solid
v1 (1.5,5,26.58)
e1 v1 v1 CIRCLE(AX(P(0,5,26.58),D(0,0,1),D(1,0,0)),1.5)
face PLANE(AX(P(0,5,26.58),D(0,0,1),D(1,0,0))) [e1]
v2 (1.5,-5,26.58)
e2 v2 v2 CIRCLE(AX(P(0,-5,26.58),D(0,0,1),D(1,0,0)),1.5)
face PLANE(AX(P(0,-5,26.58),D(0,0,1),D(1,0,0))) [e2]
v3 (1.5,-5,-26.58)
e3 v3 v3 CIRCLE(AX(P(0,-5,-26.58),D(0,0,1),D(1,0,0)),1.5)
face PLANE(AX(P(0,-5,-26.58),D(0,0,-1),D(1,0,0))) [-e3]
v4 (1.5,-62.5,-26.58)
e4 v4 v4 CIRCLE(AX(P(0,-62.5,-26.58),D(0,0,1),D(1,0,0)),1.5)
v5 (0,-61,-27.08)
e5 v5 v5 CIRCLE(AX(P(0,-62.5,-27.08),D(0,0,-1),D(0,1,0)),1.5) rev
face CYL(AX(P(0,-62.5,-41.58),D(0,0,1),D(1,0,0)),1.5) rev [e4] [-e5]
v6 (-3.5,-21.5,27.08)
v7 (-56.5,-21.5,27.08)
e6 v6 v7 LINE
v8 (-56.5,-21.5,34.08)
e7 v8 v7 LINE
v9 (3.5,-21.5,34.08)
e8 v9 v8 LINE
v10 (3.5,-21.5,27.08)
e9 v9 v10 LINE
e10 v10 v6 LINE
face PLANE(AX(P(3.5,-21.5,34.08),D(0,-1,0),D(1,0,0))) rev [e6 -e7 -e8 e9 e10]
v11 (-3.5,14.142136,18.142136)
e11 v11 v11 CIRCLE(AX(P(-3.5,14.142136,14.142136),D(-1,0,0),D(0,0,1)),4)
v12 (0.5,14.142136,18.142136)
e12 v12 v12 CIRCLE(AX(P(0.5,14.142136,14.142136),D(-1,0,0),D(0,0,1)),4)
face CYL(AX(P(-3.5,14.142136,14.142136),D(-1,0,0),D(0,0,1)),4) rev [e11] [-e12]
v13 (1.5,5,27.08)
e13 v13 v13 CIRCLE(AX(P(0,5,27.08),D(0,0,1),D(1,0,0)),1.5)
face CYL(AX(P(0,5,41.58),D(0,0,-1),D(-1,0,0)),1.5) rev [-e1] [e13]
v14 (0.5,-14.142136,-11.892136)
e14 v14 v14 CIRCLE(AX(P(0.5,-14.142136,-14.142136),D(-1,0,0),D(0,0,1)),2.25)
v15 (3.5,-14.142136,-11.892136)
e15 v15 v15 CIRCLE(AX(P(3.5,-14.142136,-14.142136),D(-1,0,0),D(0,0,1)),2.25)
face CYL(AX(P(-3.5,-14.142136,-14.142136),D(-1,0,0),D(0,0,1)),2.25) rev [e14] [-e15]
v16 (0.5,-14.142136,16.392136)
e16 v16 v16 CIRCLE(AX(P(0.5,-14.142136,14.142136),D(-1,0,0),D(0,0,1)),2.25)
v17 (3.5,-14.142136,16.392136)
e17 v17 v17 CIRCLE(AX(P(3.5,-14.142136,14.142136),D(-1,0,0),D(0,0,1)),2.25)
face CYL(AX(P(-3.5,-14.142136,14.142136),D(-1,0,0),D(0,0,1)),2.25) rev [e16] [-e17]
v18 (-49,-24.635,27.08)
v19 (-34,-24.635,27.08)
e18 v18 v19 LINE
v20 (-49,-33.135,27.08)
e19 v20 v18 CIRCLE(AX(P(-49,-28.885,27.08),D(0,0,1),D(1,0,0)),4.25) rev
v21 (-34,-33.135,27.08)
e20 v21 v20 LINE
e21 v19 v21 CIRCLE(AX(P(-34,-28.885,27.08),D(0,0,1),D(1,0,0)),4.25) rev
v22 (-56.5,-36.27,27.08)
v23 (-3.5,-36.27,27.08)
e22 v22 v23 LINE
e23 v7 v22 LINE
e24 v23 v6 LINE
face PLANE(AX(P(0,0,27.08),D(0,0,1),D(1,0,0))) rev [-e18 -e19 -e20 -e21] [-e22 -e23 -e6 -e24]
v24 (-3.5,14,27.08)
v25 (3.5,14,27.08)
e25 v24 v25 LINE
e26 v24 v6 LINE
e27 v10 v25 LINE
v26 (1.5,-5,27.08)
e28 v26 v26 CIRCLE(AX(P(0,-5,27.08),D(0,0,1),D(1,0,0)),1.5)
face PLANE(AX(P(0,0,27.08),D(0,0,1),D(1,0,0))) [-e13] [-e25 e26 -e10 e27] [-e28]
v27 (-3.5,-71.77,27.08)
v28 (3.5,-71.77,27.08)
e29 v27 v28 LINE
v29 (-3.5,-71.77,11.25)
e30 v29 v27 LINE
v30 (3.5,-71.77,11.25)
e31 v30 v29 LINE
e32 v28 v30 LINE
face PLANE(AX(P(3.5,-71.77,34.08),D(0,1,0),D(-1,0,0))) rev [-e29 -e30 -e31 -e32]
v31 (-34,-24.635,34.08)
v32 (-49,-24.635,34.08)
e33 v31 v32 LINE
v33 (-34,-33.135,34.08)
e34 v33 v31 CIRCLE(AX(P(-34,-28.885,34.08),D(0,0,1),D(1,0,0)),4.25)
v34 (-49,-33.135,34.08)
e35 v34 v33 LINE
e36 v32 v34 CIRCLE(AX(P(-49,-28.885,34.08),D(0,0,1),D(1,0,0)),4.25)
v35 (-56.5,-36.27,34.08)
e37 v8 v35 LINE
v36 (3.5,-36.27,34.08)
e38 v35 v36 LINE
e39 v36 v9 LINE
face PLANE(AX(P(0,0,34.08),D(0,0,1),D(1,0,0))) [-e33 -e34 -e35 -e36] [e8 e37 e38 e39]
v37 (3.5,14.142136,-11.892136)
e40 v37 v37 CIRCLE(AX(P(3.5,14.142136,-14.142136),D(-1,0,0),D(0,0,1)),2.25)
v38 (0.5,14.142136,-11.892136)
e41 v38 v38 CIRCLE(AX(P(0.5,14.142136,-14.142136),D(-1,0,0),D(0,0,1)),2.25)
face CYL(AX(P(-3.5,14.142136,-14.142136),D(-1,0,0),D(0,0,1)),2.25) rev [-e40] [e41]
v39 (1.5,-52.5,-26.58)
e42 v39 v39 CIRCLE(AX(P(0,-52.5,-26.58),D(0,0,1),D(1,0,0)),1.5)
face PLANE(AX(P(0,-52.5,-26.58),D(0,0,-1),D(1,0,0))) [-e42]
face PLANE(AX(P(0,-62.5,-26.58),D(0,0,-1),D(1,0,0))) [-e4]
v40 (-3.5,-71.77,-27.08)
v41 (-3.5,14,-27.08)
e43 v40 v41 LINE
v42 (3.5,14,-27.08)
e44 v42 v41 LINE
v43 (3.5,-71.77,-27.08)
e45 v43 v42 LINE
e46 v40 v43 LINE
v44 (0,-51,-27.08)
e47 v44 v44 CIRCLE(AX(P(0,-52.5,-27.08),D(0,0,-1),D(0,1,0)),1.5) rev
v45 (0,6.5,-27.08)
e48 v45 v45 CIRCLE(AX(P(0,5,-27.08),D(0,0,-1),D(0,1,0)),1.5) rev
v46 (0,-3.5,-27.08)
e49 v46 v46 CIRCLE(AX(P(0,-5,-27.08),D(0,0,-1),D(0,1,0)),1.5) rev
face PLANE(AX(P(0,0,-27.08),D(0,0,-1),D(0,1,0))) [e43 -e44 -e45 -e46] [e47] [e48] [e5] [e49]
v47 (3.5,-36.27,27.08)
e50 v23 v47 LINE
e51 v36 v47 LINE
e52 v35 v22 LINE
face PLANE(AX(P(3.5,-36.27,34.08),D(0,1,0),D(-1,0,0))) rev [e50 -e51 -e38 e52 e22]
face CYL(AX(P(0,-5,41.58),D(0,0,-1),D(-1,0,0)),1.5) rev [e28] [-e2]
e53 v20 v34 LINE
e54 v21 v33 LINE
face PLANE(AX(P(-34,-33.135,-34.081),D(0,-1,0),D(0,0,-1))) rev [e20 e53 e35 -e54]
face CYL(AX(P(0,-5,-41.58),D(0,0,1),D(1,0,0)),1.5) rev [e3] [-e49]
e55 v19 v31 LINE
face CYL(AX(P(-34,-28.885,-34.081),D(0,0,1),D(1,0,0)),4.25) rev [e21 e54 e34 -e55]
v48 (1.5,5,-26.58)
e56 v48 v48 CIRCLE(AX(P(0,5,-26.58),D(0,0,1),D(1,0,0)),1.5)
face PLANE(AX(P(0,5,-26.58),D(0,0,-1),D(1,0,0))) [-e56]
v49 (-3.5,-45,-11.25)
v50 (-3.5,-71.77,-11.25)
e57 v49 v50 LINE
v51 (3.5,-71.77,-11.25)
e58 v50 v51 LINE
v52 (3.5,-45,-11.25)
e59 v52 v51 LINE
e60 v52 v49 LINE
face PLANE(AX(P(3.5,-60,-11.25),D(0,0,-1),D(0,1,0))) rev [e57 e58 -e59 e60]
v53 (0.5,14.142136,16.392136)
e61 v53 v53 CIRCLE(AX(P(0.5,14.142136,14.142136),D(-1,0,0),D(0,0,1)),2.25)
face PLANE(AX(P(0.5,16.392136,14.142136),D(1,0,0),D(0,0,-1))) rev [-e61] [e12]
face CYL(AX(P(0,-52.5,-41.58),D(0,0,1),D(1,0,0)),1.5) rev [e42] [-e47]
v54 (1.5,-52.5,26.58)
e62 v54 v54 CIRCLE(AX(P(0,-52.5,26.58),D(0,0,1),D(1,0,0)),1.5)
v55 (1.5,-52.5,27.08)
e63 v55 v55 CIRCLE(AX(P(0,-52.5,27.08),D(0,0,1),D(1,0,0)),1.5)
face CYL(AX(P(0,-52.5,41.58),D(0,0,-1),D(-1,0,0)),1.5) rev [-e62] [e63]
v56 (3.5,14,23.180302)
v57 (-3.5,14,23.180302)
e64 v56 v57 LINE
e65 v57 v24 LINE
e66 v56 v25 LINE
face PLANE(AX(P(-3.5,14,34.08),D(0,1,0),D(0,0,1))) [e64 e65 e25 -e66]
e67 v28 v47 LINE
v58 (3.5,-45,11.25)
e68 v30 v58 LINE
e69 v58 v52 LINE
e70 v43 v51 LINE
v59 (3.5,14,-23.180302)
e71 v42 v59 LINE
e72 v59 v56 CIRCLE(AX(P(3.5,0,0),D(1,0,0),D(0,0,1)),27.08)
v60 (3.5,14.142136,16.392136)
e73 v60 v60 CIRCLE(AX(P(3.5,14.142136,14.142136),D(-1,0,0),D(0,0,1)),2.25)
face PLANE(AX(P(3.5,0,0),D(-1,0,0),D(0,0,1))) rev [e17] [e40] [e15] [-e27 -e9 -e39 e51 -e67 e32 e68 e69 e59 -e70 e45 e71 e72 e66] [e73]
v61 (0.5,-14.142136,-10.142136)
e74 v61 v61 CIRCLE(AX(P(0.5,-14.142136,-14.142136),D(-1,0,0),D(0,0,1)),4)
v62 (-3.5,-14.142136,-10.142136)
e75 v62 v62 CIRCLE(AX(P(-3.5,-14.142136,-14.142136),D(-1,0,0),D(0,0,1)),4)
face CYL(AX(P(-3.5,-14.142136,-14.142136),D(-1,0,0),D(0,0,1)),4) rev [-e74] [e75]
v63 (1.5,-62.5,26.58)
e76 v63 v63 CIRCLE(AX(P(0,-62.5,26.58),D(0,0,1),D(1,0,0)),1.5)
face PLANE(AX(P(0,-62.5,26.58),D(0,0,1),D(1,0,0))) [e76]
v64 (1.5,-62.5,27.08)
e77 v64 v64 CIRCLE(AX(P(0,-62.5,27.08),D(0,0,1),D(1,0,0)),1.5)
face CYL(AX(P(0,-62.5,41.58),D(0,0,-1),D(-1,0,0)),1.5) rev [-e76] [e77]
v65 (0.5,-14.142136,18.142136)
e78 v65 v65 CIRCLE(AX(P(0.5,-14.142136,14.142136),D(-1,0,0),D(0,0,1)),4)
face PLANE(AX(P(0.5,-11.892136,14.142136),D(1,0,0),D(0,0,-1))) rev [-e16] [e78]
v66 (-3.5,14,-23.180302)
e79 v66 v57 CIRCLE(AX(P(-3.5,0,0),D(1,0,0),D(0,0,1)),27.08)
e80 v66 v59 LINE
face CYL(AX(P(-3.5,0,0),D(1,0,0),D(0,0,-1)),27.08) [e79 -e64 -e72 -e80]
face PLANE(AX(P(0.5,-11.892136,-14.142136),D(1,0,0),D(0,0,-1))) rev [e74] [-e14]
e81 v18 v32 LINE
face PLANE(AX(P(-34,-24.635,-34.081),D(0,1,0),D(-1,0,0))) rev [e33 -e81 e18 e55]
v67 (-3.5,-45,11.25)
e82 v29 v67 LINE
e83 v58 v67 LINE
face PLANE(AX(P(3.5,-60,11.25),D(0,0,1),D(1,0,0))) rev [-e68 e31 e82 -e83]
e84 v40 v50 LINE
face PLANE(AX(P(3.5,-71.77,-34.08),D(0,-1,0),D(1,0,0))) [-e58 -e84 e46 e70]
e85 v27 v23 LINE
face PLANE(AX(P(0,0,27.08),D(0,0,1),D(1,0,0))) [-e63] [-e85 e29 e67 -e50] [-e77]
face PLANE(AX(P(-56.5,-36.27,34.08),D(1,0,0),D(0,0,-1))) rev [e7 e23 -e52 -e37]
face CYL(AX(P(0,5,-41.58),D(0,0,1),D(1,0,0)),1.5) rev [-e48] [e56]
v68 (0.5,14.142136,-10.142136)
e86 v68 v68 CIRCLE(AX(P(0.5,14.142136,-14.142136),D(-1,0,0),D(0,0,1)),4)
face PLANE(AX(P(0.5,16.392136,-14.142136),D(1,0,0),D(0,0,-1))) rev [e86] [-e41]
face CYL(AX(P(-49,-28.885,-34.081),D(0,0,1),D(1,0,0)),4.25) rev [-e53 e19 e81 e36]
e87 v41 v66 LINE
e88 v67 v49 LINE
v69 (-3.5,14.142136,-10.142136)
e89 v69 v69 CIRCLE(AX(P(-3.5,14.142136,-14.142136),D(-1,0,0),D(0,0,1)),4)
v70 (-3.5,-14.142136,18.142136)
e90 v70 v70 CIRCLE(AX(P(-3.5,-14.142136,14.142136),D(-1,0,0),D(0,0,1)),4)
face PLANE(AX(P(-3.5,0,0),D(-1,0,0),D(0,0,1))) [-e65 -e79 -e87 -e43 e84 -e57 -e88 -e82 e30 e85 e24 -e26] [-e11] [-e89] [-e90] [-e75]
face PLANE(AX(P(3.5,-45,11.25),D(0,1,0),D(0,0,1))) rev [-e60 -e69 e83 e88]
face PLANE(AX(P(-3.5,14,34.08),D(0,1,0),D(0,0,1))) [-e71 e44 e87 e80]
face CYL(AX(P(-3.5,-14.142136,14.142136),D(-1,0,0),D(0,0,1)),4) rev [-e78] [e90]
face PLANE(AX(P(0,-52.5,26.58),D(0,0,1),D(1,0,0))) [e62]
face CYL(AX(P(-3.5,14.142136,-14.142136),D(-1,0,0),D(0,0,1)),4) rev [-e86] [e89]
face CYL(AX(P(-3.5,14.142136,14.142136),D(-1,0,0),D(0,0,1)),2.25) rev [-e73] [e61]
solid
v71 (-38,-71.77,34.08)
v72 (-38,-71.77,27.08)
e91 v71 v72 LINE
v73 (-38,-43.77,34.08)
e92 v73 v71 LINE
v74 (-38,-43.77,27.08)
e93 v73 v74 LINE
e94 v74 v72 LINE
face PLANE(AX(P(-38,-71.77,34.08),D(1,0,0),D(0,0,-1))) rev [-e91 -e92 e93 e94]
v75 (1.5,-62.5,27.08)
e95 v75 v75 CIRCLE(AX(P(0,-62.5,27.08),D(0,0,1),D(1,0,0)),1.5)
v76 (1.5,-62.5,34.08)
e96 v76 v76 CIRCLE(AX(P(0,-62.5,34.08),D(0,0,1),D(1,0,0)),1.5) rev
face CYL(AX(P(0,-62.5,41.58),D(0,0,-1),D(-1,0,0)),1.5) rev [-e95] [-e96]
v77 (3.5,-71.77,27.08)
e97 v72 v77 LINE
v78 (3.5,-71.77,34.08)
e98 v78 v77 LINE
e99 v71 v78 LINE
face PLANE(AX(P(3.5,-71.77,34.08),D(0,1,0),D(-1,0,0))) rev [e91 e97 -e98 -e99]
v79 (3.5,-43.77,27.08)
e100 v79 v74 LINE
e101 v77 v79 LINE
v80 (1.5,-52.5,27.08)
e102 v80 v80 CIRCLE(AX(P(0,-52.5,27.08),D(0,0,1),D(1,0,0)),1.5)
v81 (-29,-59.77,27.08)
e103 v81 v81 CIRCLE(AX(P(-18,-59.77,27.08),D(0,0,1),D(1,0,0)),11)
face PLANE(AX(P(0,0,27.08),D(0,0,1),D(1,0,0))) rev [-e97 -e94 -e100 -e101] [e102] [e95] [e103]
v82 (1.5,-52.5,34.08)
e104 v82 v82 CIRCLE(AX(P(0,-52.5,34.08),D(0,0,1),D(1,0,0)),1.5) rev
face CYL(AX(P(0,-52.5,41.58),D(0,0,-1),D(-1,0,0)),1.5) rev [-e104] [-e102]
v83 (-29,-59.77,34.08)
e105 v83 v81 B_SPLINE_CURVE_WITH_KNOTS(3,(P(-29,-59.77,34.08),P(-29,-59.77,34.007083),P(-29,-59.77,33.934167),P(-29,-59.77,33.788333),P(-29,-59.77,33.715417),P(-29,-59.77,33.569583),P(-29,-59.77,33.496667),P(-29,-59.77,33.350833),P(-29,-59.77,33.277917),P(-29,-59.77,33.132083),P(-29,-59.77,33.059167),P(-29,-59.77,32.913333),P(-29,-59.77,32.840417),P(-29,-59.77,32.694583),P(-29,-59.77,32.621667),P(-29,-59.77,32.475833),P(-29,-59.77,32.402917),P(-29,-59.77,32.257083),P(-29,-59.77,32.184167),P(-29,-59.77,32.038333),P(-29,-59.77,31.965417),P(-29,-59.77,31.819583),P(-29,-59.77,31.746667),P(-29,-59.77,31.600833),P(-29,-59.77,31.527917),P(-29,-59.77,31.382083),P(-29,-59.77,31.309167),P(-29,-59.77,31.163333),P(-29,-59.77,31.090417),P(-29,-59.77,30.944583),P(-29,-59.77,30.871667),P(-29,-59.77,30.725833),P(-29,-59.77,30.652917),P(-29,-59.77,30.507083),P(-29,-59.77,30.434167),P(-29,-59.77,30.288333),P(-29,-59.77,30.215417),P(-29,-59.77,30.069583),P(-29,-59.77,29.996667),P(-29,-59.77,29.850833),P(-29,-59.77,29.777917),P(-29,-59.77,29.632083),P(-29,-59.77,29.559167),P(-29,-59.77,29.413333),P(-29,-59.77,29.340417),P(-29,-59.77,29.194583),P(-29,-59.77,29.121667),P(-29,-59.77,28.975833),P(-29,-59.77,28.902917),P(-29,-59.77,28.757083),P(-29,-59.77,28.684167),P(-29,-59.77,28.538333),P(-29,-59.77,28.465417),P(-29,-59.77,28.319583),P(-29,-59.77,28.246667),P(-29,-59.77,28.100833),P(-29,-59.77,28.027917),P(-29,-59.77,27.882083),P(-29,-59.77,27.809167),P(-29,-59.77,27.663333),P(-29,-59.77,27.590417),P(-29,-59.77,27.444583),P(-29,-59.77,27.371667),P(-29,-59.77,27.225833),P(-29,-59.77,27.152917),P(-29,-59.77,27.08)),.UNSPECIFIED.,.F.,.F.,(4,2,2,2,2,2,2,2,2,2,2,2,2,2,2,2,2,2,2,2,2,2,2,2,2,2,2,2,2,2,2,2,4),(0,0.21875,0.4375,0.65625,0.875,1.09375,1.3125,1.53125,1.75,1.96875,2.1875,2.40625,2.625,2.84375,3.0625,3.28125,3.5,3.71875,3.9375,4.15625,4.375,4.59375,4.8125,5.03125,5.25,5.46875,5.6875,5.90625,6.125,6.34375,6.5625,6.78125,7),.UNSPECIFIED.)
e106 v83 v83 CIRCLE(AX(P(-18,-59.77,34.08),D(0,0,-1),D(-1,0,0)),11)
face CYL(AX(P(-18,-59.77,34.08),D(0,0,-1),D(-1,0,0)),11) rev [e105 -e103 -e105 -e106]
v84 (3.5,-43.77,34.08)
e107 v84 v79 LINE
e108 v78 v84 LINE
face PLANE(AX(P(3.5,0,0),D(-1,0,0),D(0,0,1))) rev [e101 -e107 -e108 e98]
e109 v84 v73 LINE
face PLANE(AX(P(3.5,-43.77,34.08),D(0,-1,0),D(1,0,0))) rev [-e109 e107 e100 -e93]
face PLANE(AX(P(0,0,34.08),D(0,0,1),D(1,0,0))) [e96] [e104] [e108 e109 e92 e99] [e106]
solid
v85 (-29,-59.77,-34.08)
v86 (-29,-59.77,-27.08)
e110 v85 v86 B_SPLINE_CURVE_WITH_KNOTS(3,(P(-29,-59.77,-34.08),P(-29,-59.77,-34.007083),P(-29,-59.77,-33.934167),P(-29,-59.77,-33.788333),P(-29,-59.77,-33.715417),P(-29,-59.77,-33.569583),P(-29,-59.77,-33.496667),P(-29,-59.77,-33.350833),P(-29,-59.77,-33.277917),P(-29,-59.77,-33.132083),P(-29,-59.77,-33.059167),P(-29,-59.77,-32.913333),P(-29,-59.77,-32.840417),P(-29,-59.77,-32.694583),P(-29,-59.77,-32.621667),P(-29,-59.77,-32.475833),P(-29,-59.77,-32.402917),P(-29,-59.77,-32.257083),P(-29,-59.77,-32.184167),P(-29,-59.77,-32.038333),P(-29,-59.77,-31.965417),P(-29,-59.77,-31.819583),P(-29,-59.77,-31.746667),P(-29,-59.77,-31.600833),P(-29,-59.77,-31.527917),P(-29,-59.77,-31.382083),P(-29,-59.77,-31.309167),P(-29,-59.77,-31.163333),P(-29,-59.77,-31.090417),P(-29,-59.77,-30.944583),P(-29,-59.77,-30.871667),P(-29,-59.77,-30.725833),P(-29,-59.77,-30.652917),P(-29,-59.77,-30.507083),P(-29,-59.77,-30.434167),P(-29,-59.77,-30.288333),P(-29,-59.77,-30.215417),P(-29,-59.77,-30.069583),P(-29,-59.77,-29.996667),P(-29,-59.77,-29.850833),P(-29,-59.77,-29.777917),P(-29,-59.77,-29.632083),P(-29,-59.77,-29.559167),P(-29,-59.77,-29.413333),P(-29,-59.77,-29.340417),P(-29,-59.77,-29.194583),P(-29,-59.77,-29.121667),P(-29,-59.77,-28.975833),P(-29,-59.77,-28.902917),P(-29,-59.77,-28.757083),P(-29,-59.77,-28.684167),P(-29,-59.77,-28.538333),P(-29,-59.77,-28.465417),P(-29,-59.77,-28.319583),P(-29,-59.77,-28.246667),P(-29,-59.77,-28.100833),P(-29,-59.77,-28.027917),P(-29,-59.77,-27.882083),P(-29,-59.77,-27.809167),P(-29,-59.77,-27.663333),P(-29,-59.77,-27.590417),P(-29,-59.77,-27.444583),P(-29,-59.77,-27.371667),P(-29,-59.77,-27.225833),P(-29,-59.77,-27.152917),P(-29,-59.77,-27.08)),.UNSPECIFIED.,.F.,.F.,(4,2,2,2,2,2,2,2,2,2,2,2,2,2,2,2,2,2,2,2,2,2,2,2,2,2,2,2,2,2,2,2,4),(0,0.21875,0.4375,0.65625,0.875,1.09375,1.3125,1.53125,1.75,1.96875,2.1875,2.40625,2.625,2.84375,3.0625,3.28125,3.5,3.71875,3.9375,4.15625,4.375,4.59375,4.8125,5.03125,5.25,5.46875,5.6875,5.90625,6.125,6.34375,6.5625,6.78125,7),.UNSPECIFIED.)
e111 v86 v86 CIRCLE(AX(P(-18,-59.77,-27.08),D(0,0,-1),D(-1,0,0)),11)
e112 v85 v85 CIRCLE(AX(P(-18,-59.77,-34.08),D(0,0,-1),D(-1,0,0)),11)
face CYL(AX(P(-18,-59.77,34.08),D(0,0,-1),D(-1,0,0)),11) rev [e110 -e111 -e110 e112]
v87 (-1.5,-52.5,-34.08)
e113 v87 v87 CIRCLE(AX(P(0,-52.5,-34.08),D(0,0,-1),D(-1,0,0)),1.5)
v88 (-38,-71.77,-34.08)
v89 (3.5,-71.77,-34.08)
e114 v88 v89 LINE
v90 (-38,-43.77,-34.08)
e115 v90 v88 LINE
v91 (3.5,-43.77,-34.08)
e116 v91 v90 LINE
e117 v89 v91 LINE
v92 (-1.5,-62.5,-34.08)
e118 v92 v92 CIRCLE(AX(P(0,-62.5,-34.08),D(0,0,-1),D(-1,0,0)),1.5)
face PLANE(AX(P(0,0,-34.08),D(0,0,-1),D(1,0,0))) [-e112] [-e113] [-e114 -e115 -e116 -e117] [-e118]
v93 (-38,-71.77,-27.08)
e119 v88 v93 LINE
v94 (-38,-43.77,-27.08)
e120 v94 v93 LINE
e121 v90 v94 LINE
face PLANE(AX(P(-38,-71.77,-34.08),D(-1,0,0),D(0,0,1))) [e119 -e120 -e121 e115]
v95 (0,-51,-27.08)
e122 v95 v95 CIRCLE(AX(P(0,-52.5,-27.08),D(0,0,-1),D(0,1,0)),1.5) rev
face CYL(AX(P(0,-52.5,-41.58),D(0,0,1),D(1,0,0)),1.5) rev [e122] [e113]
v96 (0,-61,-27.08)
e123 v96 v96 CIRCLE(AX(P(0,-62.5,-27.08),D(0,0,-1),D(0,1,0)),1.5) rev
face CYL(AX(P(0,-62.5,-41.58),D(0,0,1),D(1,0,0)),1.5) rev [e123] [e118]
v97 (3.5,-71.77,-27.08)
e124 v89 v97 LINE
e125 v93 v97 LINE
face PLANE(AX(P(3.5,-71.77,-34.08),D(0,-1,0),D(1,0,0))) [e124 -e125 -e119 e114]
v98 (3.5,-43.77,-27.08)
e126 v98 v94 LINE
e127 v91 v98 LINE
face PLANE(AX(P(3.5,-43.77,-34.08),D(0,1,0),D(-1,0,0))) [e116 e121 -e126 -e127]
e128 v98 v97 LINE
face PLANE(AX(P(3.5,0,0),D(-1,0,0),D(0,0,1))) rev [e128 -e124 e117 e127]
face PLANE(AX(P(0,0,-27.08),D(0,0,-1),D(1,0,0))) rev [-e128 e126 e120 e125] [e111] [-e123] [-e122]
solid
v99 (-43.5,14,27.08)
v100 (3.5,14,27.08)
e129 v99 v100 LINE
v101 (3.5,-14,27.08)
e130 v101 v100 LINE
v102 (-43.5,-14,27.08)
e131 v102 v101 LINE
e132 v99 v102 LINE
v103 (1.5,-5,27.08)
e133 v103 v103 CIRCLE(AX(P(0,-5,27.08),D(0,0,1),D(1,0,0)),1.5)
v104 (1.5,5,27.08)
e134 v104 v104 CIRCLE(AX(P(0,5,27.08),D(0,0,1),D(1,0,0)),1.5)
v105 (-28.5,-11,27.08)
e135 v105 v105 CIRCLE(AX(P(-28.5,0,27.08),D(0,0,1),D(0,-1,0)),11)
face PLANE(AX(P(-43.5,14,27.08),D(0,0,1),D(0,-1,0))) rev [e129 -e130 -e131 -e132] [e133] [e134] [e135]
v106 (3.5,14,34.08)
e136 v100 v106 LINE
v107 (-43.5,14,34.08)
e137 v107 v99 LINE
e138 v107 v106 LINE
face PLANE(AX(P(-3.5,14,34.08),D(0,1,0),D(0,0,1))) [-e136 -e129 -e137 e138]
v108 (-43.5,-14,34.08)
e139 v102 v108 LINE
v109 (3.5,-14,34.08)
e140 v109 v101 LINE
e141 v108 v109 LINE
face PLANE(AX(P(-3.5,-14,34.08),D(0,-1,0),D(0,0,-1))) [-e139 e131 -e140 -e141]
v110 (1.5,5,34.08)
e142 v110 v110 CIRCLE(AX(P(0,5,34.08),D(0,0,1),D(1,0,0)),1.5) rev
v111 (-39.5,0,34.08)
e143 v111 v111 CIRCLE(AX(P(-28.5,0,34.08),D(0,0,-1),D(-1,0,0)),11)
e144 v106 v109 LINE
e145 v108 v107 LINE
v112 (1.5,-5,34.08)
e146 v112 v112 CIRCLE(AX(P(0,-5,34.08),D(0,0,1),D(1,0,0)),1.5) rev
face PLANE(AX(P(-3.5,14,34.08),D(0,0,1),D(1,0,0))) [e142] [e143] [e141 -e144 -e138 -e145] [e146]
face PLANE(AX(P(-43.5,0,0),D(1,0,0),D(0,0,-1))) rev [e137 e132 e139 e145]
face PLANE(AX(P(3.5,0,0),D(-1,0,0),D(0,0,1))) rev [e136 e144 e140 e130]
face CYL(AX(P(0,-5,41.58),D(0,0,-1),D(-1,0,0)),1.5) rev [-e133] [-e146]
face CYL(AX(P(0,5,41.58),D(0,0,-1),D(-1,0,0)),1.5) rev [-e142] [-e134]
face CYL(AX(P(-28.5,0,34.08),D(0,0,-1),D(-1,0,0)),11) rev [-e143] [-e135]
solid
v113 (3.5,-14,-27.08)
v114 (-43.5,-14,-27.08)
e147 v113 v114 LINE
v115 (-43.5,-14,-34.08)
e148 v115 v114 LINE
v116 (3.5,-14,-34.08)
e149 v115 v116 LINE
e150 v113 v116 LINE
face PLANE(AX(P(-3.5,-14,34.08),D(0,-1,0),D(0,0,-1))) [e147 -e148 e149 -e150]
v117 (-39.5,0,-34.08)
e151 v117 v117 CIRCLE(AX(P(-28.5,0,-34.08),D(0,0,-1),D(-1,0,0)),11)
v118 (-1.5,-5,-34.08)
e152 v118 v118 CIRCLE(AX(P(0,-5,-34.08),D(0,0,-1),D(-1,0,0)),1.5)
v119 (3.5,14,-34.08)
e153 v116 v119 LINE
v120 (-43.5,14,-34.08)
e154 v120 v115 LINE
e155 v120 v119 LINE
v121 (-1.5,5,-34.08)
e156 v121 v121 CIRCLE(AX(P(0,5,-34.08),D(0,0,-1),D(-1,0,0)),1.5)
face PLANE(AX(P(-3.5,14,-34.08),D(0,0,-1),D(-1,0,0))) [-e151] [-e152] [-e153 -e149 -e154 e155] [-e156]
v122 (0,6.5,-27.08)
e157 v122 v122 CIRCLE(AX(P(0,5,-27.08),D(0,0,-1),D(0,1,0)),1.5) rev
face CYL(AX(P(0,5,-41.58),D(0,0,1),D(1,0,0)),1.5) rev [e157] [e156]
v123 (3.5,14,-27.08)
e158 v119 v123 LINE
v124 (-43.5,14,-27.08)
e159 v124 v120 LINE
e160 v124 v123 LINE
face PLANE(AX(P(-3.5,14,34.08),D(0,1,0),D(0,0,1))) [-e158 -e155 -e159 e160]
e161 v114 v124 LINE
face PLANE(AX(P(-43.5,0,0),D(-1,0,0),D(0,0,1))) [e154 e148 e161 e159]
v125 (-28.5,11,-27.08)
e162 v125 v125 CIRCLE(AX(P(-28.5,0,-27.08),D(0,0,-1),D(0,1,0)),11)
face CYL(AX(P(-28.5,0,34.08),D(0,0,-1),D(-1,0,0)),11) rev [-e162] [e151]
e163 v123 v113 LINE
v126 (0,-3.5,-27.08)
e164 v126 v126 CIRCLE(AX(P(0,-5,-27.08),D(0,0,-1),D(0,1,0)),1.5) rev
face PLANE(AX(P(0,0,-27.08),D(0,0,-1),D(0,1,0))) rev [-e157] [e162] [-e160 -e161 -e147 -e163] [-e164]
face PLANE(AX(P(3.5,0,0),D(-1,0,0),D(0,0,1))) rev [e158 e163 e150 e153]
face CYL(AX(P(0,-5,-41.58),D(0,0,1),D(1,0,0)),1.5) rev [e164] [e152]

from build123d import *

# Parameters (mm, degrees)
BOSS_EXTRUDE1_DEPTH            = 3.5
BOSS_EXTRUDE1_DEPTH_BACK       = 3.5
BOSS_EXTRUDE2_DEPTH            = 3.5
BOSS_EXTRUDE2_DEPTH_BACK       = 3.5
SKETCH3_W                      = 68.16
SKETCH3_H                      = 28
CBORE_FOR_M4_SHCS1_D           = 4.5
CBORE_FOR_M4_SHCS1_CBORE_D     = 8
CBORE_FOR_M4_SHCS1_CBORE_DEPTH = 4
SKETCH5_W                      = 7
SKETCH5_H                      = 28
BOSS_EXTRUDE4_DEPTH            = 40
SKETCH6_R                      = 11
CUT_EXTRUDE2_DEPTH             = 101.687812569
SKETCH7_W                      = 22.5
SKETCH7_H                      = 15
CUT_EXTRUDE3_DEPTH             = 80.758676017
SKETCH8_W                      = 41.5
SKETCH8_H                      = 28
BOSS_EXTRUDE5_DEPTH            = 7
CUT_EXTRUDE4_DEPTH             = 104.844732654
CUT_EXTRUDE4_DEPTH_BACK        = 104.844732654
SKETCH9_R                      = 11
SKETCH17_W                     = 7
SKETCH17_H                     = 15.83
BOSS_EXTRUDE8_DEPTH            = 11.77
SKETCH13_W                     = 60
SKETCH13_H                     = 14.77
BOSS_EXTRUDE7_DEPTH            = 7
CUT_EXTRUDE5_REACH             = 115.969
SKETCH16_R                     = 1.5
CUT_EXTRUDE6_DEPTH             = 7.5
SPLIT1_START                   = 27.08
SPLIT1_OUTLINE_W               = 41.5
SPLIT1_OUTLINE_H               = 28
SPLIT1_OUTLINE_R               = 11
SPLIT1_OUTLINE_R_2             = 1.5
SPLIT1_DEPTH                   = 7
SPLIT1_2_OUTLINE_W             = 47
SPLIT1_2_OUTLINE_H             = 28
SPLIT1_2_OUTLINE_R             = 1.5
SPLIT1_2_OUTLINE_R_2           = 11
SPLIT1_2_DEPTH                 = 7
SPLIT1_3_OUTLINE_W             = 41.5
SPLIT1_3_OUTLINE_H             = 28
SPLIT1_3_OUTLINE_R             = 11
SPLIT1_3_OUTLINE_R_2           = 1.5
SPLIT1_3_OUTLINE_W_2           = 47
SPLIT1_3_DEPTH                 = 7


# Read off the part's stored shape, not the designer's step: Split1
with BuildPart() as part:
    # Sketch1 → Boss-Extrude1 (new, two sides: drawn at the far end of the back side and taken through both)
    with BuildSketch(Plane(origin=(0, 0, 0), x_dir=(0, 0, -1), z_dir=(1, 0, 0)).offset(-BOSS_EXTRUDE1_DEPTH_BACK)):
        with BuildLine():
            Line((-27.08, 0), (-27.08, -60))
            Line((-27.08, -60), (27.08, -60))
            Line((27.08, -60), (27.08, 0))
            ThreePointArc((27.08, 0), (0, 27.08), (-27.08, 0))
        make_face()
    extrude(amount=BOSS_EXTRUDE1_DEPTH + BOSS_EXTRUDE1_DEPTH_BACK)

    # Sketch3 → Boss-Extrude2 (add, two sides: drawn at the far end of the back side and taken through both)
    with BuildSketch(Plane(origin=(0, 0, 0), x_dir=(0, 0, -1), z_dir=(1, 0, 0)).offset(-BOSS_EXTRUDE2_DEPTH_BACK)):
        Rectangle(SKETCH3_W, SKETCH3_H)
    extrude(amount=BOSS_EXTRUDE2_DEPTH + BOSS_EXTRUDE2_DEPTH_BACK)

    # CBORE for M4 SHCS1 (through all)
    with Locations(Plane(origin=(-3.5, 0, 0), x_dir=(0, 0, -1), z_dir=(-1, 0, 0))):
        with Locations((-14.142135624, -14.142135624), (-14.142135624, 14.142135624), (14.142135624, 14.142135624), (14.142135624, -14.142135624)):
            CounterBoreHole(CBORE_FOR_M4_SHCS1_D / 2, CBORE_FOR_M4_SHCS1_CBORE_D / 2, CBORE_FOR_M4_SHCS1_CBORE_DEPTH)

    # Sketch5 → Boss-Extrude4 (add)
    with BuildSketch(Plane.ZY.offset(3.5)):
        with Locations((-30.58, 0)):
            Rectangle(SKETCH5_W, SKETCH5_H)
        with Locations((30.58, 0)):
            Rectangle(SKETCH5_W, SKETCH5_H)
    extrude(amount=BOSS_EXTRUDE4_DEPTH)

    # Sketch6 → Cut-Extrude2 (cut, through all)
    with BuildSketch(Plane(origin=(0, 0, -34.08), x_dir=(-1, 0, 0), z_dir=(0, 0, -1))):
        with Locations((28.5, 0)):
            Circle(SKETCH6_R)
    extrude(amount=-CUT_EXTRUDE2_DEPTH, mode=Mode.SUBTRACT)

    # Sketch7 → Cut-Extrude3 (cut, through all)
    with BuildSketch(Plane.ZY.offset(3.5)):
        with Locations((0, -52.5)):
            Rectangle(SKETCH7_W, SKETCH7_H)
    extrude(amount=-CUT_EXTRUDE3_DEPTH, mode=Mode.SUBTRACT)

    # Sketch8 → Boss-Extrude5 (add)
    with BuildSketch(Plane.XY.offset(27.08)):
        with Locations((-17.25, -57.77)):
            Rectangle(SKETCH8_W, SKETCH8_H)
    boss_extrude5 = extrude(amount=BOSS_EXTRUDE5_DEPTH)

    # Mirror1: Boss-Extrude5 across plane
    add(boss_extrude5.mirror(Plane.XY))

    # Sketch9 → Cut-Extrude4 (cut, two sides: drawn at the far end of the back side and taken through both)
    with BuildSketch(Plane(origin=(0, 0, 27.08), x_dir=(-1, 0, 0), z_dir=(0, 0, -1)).offset(-CUT_EXTRUDE4_DEPTH_BACK)):
        with Locations((18, -59.77)):
            Circle(SKETCH9_R)
    extrude(amount=CUT_EXTRUDE4_DEPTH + CUT_EXTRUDE4_DEPTH_BACK, mode=Mode.SUBTRACT)

    # Sketch17 → Boss-Extrude8 (add)
    with BuildSketch(Plane.XZ.offset(60)):
        with Locations((0, 19.165)):
            Rectangle(SKETCH17_W, SKETCH17_H)
        with Locations((0, -19.165)):
            Rectangle(SKETCH17_W, SKETCH17_H)
    extrude(amount=BOSS_EXTRUDE8_DEPTH)

    # Sketch13 → Boss-Extrude7 (add)
    with BuildSketch(Plane.XY.offset(27.08)):
        with Locations((-26.5, -28.885)):
            Rectangle(SKETCH13_W, SKETCH13_H)
    extrude(amount=BOSS_EXTRUDE7_DEPTH)

    # Sketch15 → Cut-Extrude5 (cut, up to next)
    with BuildSketch(Plane.XY.offset(34.08), mode=Mode.PRIVATE) as cut_extrude5_sk1:
        with BuildLine():
            Line((-34, -33.135), (-49, -33.135))
            ThreePointArc((-49, -33.135), (-53.25, -28.885), (-49, -24.635))
            Line((-49, -24.635), (-34, -24.635))
            ThreePointArc((-34, -24.635), (-29.75, -28.885), (-34, -33.135))
        make_face()
    cut_extrude5_tool1 = extrude(cut_extrude5_sk1.sketch, amount=-CUT_EXTRUDE5_REACH, mode=Mode.PRIVATE) & part.part
    add(cut_extrude5_tool1.solids().sort_by_distance((-41.5, -28.885, 34.08))[0], mode=Mode.SUBTRACT)

    # Sketch16 → Cut-Extrude6 (cut, symmetric)
    with BuildSketch(Plane.XY.offset(34.08)):
        with Locations((0, 5)):
            Circle(SKETCH16_R)
        with Locations((0, -5)):
            Circle(SKETCH16_R)
        with Locations((0, -52.5)):
            Circle(SKETCH16_R)
        with Locations((0, -62.5)):
            Circle(SKETCH16_R)
    cut_extrude6 = extrude(amount=CUT_EXTRUDE6_DEPTH, both=True, mode=Mode.SUBTRACT)

    # Mirror3: Cut-Extrude6 across plane
    add(cut_extrude6.mirror(Plane.XY), mode=Mode.SUBTRACT)

    # Split1 3 outline → Split1 3 (cut)
    # profile 1 of 2: a face of its own
    with BuildSketch(Plane.XY.offset(SPLIT1_START)):
        with Locations((-17.25, -57.77)):
            Rectangle(SPLIT1_3_OUTLINE_W, SPLIT1_3_OUTLINE_H)
        with Locations((-18, -59.77)):
            Circle(SPLIT1_3_OUTLINE_R, mode=Mode.SUBTRACT)
        with Locations((0, -62.5)):
            Circle(SPLIT1_3_OUTLINE_R_2, mode=Mode.SUBTRACT)
        with Locations((0, -52.5)):
            Circle(SPLIT1_3_OUTLINE_R_2, mode=Mode.SUBTRACT)
    # profile 2 of 2: a face of its own
    with BuildSketch(Plane.XY.offset(SPLIT1_START)):
        with Locations((-20, 0)):
            Rectangle(SPLIT1_3_OUTLINE_W_2, SPLIT1_3_OUTLINE_H)
        with Locations((-28.5, 0)):
            Circle(SPLIT1_3_OUTLINE_R, mode=Mode.SUBTRACT)
        with Locations((0, -5)):
            Circle(SPLIT1_3_OUTLINE_R_2, mode=Mode.SUBTRACT)
        with Locations((0, 5)):
            Circle(SPLIT1_3_OUTLINE_R_2, mode=Mode.SUBTRACT)
    extrude(amount=SPLIT1_3_DEPTH, mode=Mode.SUBTRACT)


with BuildPart() as body_2:
    # Split1 outline → Split1 (new body)
    with BuildSketch(Plane.XY.offset(SPLIT1_START)):
        with Locations((-17.25, -57.77)):
            Rectangle(SPLIT1_OUTLINE_W, SPLIT1_OUTLINE_H)
        with Locations((-18, -59.77)):
            Circle(SPLIT1_OUTLINE_R, mode=Mode.SUBTRACT)
        with Locations((0, -62.5)):
            Circle(SPLIT1_OUTLINE_R_2, mode=Mode.SUBTRACT)
        with Locations((0, -52.5)):
            Circle(SPLIT1_OUTLINE_R_2, mode=Mode.SUBTRACT)
    extrude(amount=SPLIT1_DEPTH)


with BuildPart() as body_3:
    # Split1 2 outline → Split1 2 (new body)
    with BuildSketch(Plane.XY.offset(SPLIT1_START)):
        with Locations((-20, 0)):
            Rectangle(SPLIT1_2_OUTLINE_W, SPLIT1_2_OUTLINE_H)
        with Locations((0, -5)):
            Circle(SPLIT1_2_OUTLINE_R, mode=Mode.SUBTRACT)
        with Locations((-28.5, 0)):
            Circle(SPLIT1_2_OUTLINE_R_2, mode=Mode.SUBTRACT)
        with Locations((0, 5)):
            Circle(SPLIT1_2_OUTLINE_R, mode=Mode.SUBTRACT)
    extrude(amount=SPLIT1_2_DEPTH)


with BuildPart() as body_4:
    # Split2: the piece on the far side of the plane
    add(part.part)
    split(bisect_by=Plane(origin=(0, 0, -27.08), x_dir=(0, -1, 0), z_dir=(0, 0, -1)), keep=Keep.BOTTOM)


with BuildPart() as part_1:
    add(part.part)

    # Split2
    split(bisect_by=Plane(origin=(0, 0, -27.08), x_dir=(0, -1, 0), z_dir=(0, 0, -1)), keep=Keep.TOP)


solid = Compound([body_2.part, body_3.part, body_4.part, part_1.part])
